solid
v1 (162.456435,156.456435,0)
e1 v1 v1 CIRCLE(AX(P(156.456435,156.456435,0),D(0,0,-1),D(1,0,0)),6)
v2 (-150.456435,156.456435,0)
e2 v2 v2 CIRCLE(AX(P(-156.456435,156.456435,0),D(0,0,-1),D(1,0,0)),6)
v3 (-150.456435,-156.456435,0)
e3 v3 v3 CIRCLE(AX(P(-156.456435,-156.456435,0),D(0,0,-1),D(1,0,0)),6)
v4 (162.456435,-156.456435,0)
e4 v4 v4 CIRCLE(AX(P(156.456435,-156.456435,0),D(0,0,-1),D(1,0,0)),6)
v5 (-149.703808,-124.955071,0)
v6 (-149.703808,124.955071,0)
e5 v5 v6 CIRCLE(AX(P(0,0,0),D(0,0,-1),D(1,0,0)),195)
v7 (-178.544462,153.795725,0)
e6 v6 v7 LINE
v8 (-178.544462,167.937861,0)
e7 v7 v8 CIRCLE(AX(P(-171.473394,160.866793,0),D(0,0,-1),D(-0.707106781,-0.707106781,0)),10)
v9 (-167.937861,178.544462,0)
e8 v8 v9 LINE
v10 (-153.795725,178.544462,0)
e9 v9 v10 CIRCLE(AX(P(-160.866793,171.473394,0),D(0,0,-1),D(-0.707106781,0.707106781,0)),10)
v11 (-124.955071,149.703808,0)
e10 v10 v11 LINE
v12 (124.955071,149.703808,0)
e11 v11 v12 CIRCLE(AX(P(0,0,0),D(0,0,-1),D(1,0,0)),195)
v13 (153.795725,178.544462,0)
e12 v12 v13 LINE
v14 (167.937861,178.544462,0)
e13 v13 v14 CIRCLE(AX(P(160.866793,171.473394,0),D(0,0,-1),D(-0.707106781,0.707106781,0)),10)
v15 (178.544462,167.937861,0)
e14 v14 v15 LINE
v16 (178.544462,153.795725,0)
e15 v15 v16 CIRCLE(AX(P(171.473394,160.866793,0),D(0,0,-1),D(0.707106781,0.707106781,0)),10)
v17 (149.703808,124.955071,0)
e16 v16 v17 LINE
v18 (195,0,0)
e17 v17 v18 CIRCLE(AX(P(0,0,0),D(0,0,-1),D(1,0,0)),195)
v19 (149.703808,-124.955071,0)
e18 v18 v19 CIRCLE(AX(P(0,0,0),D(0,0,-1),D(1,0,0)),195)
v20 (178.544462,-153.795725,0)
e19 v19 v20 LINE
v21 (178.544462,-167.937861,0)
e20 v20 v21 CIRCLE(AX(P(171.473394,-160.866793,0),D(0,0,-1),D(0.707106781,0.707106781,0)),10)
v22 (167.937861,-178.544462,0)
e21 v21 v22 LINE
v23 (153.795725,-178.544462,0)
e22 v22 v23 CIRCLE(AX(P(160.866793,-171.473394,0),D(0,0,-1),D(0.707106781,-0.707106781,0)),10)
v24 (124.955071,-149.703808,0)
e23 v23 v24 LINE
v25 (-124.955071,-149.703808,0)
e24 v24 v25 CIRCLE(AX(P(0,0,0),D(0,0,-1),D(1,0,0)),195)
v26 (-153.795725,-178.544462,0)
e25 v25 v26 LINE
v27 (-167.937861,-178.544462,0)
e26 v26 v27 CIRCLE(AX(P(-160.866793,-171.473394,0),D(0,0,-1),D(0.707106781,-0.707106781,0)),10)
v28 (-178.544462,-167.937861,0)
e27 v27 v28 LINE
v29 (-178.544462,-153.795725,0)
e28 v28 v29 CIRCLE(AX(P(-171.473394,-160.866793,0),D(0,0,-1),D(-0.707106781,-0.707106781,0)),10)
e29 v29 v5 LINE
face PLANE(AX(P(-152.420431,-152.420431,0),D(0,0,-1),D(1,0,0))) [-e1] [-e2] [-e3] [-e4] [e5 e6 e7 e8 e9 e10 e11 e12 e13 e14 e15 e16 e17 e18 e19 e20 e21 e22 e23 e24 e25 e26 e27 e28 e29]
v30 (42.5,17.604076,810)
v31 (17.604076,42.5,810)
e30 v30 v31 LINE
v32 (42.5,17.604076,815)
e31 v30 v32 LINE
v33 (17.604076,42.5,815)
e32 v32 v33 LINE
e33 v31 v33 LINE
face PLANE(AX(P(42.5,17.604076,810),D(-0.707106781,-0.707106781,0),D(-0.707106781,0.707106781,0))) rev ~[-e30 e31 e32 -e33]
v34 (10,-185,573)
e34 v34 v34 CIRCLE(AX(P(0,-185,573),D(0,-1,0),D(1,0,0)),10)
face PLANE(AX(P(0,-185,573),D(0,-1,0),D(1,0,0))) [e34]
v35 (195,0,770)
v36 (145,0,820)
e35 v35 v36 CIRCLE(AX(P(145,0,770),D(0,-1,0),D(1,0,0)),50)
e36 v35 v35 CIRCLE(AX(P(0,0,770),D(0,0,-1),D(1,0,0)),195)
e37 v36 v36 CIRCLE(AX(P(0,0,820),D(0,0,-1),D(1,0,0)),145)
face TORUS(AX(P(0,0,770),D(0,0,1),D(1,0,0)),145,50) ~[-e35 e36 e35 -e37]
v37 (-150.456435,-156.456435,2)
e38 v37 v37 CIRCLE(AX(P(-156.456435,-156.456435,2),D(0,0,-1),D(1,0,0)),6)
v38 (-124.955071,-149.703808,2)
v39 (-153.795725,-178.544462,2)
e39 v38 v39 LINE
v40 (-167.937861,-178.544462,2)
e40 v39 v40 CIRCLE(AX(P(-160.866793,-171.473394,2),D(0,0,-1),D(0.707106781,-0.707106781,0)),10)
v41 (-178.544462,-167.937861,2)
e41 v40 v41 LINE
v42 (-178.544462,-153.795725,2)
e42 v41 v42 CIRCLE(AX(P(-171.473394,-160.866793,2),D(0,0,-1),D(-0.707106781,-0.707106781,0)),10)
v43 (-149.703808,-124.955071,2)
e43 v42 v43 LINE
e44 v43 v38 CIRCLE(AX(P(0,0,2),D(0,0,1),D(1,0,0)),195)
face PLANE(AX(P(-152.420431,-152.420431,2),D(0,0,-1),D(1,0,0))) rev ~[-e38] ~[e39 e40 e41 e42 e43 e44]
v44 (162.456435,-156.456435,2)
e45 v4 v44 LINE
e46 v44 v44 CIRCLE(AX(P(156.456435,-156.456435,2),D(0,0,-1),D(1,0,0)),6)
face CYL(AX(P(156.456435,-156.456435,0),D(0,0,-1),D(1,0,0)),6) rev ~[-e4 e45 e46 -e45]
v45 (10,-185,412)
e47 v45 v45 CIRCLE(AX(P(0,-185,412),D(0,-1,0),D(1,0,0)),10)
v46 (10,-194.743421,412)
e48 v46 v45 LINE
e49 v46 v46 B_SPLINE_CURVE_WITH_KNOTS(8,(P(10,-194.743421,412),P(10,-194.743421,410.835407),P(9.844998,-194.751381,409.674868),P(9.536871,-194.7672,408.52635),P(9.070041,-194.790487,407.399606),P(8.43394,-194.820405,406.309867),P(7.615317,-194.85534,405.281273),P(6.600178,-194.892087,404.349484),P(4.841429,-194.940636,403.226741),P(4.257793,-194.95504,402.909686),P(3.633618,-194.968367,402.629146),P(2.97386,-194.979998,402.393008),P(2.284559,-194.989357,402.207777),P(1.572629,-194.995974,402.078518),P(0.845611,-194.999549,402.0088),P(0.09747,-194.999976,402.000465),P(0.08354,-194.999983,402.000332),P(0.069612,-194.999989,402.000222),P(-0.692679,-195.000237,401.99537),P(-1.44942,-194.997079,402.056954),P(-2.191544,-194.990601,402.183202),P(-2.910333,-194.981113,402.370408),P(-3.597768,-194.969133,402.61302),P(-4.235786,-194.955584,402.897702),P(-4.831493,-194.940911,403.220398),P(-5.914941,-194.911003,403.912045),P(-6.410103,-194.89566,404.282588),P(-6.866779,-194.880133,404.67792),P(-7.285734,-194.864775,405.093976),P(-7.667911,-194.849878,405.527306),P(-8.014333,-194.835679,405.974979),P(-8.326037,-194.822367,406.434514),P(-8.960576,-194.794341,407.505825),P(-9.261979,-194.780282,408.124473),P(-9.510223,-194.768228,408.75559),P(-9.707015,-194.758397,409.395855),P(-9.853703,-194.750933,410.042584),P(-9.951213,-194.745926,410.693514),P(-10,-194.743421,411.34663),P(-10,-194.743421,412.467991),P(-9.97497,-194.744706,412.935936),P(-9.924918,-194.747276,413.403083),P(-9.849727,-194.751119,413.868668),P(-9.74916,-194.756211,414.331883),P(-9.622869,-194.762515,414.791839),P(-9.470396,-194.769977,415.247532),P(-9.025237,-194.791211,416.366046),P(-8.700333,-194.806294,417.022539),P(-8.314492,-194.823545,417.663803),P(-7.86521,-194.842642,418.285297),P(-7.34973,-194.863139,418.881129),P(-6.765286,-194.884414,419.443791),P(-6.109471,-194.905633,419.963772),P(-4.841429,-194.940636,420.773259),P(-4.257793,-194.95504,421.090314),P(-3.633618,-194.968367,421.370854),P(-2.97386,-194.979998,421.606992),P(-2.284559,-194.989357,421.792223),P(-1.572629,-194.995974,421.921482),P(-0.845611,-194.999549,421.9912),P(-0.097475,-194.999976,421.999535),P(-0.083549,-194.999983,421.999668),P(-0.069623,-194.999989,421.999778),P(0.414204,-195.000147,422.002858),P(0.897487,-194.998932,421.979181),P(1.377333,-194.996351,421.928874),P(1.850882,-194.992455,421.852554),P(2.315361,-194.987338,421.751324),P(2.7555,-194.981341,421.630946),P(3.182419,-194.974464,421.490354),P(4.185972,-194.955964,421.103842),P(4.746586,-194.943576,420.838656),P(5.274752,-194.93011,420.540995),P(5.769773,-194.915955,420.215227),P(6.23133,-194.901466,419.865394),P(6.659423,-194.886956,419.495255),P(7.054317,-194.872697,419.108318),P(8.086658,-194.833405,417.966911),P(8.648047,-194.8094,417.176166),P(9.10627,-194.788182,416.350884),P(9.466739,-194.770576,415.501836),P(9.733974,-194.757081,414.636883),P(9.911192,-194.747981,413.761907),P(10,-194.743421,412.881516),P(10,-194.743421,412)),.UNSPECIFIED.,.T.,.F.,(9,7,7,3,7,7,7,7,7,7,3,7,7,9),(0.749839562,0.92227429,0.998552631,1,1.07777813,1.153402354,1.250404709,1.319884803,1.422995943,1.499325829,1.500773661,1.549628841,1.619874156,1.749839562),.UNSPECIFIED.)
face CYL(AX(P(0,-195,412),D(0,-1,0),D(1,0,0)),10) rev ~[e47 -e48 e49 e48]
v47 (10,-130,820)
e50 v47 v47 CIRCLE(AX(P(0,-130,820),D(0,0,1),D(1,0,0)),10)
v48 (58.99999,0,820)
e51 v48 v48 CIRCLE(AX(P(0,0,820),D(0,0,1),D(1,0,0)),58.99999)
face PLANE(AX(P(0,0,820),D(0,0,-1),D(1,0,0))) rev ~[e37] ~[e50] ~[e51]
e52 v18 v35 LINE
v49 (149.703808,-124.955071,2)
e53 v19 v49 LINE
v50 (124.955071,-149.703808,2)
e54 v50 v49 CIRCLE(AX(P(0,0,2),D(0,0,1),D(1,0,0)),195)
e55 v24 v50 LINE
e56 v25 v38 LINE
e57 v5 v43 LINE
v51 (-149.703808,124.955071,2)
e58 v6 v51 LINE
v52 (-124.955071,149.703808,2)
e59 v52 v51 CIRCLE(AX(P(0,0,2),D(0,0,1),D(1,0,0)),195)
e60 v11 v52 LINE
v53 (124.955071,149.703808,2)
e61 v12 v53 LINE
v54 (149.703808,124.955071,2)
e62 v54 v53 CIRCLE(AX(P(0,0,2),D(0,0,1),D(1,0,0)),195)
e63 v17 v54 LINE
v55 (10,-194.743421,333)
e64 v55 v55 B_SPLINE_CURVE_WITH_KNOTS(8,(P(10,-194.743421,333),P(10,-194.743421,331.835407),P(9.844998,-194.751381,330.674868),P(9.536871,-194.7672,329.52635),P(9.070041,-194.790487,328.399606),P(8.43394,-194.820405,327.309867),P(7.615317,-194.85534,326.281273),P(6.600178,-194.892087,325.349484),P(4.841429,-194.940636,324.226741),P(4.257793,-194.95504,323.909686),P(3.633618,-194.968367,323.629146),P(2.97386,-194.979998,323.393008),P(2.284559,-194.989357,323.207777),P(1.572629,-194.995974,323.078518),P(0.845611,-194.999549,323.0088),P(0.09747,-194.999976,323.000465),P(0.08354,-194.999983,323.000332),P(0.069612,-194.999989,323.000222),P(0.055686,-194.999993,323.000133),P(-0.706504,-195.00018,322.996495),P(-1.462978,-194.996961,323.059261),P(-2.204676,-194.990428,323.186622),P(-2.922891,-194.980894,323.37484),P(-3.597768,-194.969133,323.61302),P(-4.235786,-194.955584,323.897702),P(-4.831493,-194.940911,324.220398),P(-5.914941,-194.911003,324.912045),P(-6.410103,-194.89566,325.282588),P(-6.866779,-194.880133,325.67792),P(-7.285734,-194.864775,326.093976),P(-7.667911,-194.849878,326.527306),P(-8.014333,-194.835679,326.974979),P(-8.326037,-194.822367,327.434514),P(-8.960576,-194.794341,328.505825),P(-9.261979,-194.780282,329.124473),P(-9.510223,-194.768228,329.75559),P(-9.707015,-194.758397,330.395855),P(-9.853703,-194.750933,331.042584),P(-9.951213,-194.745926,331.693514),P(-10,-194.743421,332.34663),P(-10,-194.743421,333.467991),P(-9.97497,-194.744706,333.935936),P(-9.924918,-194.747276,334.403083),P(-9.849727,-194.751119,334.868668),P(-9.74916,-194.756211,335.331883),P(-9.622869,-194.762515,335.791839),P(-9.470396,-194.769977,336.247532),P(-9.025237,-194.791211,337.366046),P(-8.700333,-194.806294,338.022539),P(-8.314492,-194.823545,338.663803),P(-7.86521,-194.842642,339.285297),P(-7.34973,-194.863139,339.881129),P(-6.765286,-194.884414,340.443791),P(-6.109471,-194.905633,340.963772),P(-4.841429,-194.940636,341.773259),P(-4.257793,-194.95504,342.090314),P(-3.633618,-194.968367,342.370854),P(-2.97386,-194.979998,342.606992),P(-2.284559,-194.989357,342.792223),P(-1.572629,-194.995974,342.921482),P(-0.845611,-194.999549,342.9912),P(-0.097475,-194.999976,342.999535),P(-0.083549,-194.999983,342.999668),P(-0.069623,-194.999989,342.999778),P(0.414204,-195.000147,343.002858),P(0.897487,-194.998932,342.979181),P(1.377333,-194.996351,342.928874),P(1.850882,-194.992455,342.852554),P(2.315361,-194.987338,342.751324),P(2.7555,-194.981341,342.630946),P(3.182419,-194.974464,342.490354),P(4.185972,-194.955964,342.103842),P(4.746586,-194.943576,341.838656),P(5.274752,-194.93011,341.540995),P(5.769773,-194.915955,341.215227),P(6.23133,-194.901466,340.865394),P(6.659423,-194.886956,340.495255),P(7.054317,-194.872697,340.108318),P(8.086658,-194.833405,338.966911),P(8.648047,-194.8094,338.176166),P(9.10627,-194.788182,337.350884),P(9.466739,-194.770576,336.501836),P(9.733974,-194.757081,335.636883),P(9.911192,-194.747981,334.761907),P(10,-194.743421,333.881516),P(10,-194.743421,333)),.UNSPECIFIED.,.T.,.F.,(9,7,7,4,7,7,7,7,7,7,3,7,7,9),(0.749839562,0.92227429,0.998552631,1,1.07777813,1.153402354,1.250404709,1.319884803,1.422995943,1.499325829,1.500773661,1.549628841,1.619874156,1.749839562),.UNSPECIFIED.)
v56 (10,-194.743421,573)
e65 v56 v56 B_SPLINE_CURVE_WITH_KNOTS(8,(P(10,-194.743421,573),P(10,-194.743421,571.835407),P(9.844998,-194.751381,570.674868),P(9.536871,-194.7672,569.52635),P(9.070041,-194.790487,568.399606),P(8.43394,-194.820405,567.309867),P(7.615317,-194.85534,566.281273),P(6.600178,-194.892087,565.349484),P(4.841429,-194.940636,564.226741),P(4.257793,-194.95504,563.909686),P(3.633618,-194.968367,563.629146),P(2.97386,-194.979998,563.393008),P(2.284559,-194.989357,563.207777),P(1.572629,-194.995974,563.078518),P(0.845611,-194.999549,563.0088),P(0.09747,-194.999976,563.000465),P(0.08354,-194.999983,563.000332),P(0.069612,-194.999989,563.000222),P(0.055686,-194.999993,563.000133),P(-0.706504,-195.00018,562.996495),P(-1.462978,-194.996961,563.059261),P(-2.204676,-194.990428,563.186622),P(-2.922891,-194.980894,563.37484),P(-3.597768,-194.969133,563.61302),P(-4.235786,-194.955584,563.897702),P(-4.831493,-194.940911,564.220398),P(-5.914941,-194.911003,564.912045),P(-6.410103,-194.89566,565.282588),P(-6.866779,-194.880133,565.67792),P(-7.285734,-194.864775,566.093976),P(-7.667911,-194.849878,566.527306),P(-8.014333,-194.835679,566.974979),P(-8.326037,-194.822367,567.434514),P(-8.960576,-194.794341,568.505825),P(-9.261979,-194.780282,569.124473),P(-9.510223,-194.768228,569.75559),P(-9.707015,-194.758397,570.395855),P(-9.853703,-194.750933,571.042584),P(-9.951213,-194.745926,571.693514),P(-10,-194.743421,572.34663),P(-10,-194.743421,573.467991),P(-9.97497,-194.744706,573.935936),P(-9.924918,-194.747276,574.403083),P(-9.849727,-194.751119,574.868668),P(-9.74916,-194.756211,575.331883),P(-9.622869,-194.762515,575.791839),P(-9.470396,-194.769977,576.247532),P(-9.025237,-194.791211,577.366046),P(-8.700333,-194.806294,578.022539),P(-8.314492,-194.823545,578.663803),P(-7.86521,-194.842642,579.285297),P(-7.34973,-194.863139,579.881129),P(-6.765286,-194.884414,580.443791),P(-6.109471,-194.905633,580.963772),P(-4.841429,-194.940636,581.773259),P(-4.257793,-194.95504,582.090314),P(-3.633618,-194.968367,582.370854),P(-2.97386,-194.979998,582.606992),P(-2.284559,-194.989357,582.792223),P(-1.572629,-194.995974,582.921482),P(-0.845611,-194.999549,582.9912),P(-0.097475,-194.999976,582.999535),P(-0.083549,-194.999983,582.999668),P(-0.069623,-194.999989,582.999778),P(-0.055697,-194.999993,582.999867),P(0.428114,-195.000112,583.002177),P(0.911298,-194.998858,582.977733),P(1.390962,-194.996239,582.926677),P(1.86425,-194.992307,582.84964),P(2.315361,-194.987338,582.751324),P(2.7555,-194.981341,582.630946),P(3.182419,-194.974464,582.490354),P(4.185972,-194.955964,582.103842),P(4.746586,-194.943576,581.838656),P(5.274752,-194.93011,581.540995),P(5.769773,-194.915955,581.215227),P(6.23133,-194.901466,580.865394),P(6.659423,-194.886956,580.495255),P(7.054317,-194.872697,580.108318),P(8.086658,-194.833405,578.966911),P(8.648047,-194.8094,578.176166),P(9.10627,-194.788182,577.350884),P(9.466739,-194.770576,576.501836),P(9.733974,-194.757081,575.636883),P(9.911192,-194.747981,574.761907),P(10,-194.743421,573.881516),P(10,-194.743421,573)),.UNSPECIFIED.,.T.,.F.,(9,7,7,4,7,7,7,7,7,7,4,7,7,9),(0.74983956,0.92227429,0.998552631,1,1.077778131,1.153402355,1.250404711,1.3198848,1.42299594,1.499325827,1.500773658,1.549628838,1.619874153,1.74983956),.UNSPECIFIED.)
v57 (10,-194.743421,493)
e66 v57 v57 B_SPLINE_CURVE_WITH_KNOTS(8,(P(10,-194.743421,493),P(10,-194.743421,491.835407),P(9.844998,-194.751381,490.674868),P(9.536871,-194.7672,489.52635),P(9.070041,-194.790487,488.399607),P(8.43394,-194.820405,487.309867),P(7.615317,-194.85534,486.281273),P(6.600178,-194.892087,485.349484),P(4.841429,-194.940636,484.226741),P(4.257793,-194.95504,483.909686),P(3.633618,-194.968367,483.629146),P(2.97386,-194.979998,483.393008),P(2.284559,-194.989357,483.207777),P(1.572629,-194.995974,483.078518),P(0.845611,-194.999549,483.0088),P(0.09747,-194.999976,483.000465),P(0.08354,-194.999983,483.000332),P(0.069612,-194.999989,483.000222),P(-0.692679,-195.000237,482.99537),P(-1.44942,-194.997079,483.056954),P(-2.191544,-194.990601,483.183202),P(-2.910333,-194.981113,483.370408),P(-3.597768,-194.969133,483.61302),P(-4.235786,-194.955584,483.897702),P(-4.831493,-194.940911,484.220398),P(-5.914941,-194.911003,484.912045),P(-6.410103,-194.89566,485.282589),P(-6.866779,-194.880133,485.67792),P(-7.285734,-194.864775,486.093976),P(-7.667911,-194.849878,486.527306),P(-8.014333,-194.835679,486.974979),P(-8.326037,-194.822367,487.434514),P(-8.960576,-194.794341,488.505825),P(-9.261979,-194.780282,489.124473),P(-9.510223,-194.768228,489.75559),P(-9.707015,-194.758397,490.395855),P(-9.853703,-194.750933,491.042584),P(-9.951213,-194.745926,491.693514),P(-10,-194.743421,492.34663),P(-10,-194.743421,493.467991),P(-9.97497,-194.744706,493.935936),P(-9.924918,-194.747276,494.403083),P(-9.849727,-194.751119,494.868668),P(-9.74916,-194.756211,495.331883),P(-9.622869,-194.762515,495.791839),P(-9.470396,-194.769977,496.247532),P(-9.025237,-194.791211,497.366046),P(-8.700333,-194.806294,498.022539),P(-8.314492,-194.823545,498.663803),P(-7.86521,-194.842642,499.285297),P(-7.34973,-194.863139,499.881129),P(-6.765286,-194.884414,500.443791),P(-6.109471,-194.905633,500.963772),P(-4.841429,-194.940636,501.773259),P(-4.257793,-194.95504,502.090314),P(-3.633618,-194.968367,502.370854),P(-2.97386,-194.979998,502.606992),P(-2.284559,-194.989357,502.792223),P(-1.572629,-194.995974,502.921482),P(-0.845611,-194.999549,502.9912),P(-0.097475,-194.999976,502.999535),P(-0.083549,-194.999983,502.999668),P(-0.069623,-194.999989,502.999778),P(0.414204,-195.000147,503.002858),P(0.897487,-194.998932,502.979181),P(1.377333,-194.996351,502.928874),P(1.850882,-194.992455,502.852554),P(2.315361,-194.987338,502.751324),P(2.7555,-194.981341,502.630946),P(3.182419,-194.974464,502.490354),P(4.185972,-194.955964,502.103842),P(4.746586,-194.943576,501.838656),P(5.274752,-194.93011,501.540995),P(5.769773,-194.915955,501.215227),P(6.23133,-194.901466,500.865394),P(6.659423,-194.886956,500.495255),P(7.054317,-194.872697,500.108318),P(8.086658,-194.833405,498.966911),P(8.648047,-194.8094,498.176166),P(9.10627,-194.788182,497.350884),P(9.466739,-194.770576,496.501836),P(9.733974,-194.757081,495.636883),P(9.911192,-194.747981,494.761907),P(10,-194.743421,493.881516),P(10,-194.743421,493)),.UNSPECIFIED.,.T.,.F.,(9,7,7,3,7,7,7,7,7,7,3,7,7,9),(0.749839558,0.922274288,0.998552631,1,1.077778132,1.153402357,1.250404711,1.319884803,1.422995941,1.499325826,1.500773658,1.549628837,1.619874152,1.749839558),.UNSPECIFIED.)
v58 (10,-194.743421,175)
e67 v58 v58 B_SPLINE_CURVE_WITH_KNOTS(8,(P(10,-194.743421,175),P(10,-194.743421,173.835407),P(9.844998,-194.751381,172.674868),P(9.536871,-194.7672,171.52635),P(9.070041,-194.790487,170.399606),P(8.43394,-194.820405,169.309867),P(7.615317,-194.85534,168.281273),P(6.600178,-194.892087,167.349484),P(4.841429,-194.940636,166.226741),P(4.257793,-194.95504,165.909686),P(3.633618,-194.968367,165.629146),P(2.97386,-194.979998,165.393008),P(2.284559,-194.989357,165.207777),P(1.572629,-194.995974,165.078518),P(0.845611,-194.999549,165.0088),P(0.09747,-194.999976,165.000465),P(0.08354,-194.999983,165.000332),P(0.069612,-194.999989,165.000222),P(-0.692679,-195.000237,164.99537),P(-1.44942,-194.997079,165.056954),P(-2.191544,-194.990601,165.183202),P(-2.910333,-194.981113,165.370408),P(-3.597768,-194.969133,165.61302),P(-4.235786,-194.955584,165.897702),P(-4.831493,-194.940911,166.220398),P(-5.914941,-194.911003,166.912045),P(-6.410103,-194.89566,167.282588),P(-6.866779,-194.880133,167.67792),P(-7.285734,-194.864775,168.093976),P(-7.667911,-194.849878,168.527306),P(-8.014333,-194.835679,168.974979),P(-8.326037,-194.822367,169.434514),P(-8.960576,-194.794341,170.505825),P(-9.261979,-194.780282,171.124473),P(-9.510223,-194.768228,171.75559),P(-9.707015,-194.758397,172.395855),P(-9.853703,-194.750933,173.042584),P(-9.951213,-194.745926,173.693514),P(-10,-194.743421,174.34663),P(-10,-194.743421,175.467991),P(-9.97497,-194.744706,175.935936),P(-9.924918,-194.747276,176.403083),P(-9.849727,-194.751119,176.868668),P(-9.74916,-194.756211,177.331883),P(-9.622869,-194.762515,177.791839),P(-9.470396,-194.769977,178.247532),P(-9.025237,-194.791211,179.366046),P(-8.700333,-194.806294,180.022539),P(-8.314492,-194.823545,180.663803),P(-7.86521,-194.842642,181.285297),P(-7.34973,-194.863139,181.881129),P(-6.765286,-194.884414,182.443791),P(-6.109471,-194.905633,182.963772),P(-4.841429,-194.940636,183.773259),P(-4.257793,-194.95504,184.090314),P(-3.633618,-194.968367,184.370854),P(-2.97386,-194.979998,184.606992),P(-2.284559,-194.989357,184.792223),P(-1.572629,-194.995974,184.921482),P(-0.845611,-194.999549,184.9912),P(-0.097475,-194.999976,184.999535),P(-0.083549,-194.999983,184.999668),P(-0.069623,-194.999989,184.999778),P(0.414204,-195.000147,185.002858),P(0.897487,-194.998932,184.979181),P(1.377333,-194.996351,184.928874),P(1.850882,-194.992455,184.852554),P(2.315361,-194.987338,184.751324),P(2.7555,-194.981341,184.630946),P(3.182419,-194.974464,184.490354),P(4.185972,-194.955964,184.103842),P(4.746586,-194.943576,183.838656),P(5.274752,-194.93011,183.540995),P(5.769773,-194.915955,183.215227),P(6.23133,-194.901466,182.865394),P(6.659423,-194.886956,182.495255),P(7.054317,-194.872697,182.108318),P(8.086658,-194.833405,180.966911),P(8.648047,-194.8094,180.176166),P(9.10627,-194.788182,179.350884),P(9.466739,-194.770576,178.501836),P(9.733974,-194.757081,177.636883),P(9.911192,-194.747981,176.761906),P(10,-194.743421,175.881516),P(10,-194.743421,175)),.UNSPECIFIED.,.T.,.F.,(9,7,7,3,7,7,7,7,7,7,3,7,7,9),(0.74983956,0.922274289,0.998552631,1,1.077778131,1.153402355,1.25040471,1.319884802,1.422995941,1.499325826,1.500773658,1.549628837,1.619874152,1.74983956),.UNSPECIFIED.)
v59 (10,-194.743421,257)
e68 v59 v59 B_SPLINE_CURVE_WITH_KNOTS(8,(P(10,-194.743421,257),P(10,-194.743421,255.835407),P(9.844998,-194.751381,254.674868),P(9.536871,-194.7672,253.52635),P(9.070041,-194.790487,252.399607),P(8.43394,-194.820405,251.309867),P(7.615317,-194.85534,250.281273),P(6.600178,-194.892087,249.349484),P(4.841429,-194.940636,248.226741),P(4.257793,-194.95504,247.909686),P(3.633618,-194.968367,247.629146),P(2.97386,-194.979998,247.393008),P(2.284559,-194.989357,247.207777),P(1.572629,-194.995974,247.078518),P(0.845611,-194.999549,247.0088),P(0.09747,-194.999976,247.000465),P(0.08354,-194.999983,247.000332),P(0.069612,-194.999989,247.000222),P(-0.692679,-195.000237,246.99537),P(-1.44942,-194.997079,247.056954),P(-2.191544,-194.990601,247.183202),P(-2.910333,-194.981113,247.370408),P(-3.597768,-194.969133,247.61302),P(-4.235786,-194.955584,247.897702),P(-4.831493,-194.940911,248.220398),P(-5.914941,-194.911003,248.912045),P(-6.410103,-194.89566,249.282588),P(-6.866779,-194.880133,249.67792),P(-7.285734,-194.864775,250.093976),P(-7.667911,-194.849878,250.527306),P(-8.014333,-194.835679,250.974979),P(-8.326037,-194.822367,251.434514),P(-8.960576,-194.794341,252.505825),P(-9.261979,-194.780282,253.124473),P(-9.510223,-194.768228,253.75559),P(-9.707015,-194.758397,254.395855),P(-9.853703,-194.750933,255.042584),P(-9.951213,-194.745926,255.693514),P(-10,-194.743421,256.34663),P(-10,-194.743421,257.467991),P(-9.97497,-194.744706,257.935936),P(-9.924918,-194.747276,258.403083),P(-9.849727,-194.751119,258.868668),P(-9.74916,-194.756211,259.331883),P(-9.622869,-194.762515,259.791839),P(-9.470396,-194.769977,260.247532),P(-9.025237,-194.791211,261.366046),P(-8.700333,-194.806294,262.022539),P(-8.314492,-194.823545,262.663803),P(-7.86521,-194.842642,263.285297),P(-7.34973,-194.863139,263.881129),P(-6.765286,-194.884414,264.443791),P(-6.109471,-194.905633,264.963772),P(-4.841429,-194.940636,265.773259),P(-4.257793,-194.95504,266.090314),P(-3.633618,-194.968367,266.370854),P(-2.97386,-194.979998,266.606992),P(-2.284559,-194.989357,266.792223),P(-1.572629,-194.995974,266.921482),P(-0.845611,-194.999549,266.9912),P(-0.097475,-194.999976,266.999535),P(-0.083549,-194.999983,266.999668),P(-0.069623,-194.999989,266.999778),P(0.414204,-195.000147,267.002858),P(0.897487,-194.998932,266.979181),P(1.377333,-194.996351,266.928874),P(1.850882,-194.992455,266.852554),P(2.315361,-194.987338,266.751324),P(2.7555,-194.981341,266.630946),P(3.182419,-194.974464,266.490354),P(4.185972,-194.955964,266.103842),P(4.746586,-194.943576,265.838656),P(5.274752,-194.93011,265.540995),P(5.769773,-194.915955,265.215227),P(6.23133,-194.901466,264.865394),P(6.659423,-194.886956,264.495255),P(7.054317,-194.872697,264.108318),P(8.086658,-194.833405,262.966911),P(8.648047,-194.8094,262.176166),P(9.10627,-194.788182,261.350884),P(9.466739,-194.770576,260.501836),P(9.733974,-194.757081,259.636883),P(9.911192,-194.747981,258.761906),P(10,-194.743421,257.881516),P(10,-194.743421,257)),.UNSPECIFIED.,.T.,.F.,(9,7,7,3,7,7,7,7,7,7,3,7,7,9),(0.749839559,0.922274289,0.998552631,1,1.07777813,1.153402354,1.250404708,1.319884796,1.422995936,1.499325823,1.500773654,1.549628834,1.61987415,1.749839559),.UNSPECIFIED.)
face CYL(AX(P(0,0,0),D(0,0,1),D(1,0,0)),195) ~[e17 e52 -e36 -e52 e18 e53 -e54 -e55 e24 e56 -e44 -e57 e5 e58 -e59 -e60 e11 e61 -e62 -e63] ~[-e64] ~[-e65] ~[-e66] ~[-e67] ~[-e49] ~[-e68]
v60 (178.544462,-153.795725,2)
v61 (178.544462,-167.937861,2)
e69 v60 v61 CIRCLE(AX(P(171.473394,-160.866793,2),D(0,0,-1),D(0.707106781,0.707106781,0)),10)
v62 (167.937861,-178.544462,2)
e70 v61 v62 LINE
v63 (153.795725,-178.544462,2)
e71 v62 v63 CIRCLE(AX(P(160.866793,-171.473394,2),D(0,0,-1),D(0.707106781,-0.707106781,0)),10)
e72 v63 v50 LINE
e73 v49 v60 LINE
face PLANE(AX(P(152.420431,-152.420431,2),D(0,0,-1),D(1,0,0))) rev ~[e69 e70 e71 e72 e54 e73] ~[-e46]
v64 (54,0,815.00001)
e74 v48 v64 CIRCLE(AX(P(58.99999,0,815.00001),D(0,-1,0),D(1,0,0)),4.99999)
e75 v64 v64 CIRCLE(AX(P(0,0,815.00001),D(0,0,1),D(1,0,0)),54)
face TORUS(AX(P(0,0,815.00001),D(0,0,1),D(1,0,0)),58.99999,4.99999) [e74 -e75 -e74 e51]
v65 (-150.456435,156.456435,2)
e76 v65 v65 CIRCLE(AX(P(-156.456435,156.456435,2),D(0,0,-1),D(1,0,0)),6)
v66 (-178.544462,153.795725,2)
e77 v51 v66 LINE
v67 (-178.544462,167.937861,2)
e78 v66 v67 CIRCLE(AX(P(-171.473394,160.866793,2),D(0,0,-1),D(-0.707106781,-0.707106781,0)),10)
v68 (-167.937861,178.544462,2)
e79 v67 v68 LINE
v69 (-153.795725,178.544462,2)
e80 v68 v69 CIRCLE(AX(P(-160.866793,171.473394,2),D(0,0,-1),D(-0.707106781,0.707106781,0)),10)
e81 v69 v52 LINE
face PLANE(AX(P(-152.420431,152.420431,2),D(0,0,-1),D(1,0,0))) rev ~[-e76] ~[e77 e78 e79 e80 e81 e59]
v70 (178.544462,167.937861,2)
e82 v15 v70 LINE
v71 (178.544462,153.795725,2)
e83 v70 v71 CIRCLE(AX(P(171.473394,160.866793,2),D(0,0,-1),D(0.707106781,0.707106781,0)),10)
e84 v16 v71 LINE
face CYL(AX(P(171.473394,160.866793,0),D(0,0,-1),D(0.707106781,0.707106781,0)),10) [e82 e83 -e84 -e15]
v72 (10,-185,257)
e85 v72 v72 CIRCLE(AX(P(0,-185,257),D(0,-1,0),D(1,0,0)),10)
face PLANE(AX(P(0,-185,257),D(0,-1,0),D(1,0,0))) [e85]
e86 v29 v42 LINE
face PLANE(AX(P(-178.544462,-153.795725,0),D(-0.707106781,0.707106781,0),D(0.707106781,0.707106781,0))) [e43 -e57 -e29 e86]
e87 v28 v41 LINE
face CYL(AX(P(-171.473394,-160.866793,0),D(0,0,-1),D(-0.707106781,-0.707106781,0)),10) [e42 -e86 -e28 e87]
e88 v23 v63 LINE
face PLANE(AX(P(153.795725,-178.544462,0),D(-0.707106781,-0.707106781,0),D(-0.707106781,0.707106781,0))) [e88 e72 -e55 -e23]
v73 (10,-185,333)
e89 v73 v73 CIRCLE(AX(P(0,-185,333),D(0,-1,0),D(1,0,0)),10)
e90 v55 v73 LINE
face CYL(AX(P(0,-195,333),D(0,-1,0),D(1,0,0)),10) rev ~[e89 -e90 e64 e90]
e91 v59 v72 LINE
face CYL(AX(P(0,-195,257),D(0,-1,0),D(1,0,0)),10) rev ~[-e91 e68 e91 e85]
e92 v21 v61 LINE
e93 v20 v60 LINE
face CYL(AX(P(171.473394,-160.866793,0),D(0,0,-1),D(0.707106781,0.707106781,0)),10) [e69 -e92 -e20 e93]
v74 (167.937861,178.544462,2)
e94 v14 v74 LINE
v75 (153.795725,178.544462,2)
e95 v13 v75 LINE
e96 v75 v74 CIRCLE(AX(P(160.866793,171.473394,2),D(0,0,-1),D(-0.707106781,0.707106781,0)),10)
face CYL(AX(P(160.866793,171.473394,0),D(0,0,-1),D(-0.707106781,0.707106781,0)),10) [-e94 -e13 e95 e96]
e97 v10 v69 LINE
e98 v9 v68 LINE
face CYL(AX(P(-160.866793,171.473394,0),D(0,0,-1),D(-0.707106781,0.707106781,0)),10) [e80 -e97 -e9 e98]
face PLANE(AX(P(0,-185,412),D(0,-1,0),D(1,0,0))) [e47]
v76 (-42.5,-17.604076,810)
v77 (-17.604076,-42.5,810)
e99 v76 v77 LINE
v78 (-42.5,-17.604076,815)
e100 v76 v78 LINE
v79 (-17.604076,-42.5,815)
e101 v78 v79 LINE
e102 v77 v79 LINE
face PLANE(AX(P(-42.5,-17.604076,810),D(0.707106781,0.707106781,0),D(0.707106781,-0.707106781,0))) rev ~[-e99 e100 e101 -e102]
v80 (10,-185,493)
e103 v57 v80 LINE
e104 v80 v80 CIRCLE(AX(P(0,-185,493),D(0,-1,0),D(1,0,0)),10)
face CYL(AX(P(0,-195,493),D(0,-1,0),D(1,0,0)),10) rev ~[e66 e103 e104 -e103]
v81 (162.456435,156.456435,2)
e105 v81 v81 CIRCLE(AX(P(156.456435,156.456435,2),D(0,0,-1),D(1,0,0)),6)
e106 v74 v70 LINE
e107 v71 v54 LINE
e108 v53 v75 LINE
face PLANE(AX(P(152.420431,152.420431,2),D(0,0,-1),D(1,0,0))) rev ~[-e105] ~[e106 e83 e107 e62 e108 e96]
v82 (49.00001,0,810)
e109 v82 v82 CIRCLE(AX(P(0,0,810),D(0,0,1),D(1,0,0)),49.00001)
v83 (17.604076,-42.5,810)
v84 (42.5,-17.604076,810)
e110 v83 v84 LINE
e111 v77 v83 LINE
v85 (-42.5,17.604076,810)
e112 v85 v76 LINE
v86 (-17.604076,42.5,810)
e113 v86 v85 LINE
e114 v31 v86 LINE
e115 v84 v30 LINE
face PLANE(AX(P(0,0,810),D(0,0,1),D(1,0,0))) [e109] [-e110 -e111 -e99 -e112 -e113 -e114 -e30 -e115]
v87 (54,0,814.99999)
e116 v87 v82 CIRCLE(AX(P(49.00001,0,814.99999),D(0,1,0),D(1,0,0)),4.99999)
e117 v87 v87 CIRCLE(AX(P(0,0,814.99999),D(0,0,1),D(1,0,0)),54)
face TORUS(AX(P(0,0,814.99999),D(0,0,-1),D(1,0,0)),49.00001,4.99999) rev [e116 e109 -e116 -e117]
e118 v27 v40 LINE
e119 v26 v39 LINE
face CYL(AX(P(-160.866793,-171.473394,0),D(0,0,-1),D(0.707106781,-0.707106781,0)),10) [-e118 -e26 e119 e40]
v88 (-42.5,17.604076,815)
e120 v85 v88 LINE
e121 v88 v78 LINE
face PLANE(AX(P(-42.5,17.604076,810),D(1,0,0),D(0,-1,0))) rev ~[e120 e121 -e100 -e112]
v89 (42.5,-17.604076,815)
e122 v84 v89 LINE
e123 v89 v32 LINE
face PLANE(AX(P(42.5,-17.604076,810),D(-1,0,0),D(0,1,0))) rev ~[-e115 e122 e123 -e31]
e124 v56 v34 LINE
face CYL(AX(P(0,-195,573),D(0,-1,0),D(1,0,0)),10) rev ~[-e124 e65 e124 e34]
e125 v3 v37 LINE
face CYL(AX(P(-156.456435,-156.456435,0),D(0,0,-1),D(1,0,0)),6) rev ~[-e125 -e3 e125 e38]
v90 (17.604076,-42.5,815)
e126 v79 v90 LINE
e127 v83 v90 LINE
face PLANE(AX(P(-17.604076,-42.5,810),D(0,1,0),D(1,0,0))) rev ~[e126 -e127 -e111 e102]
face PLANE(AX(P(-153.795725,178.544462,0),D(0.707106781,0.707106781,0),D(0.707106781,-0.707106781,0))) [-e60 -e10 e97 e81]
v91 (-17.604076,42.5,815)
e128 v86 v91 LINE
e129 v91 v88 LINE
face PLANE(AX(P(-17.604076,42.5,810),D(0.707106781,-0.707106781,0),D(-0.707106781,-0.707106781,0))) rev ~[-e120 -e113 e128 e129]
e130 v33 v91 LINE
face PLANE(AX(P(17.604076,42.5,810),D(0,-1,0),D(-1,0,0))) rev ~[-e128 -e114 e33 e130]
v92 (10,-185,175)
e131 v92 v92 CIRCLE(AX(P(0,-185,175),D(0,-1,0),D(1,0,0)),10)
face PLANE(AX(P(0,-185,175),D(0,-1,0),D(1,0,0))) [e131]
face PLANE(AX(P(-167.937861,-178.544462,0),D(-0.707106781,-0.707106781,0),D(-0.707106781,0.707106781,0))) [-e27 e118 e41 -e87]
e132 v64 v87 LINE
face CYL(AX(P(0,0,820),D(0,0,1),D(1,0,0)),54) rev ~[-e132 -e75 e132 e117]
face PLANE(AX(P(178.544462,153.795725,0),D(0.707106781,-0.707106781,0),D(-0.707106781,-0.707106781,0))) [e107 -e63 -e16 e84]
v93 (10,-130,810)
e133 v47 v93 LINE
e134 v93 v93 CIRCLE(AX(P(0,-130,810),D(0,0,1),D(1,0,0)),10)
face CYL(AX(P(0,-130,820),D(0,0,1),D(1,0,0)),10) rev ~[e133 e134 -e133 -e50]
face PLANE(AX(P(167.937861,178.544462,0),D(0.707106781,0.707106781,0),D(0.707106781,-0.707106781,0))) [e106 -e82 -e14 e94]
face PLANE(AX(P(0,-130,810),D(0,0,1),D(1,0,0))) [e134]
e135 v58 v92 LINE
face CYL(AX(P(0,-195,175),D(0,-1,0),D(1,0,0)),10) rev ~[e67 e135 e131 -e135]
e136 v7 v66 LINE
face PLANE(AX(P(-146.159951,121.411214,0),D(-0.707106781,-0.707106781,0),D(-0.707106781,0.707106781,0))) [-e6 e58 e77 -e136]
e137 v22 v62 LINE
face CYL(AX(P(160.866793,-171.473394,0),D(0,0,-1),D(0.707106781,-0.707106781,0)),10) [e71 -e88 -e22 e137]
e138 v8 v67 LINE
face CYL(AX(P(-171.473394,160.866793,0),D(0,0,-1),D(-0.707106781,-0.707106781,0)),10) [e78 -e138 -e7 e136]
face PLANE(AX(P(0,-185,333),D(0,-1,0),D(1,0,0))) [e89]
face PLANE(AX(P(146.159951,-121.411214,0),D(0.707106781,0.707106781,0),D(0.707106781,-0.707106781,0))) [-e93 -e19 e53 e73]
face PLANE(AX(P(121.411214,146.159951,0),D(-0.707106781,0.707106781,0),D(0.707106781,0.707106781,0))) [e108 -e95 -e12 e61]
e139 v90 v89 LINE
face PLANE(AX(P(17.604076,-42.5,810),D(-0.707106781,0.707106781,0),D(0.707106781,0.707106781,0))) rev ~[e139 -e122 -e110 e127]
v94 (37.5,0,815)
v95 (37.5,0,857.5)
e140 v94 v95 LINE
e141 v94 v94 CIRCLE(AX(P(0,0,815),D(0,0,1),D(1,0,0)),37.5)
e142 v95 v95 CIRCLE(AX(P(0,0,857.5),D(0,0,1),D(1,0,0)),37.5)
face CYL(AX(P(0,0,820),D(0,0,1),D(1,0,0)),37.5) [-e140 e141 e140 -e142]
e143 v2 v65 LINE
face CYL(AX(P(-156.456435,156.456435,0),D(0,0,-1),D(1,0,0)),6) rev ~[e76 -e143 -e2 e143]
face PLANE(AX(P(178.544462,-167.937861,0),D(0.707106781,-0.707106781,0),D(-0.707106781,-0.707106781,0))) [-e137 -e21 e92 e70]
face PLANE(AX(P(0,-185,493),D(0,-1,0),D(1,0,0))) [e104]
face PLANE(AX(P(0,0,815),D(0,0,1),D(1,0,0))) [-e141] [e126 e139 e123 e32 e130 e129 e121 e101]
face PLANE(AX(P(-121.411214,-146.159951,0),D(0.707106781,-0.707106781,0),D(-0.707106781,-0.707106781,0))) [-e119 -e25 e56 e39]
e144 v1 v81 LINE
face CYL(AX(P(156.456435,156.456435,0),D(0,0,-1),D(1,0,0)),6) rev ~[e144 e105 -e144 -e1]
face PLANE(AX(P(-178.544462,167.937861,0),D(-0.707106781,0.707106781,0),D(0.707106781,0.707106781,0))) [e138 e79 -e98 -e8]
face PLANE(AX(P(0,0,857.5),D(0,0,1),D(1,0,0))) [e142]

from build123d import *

# Parameters (mm, degrees)
F3_R      = 54
F4_DEPTH  = 10
F5_R      = 4.99999
F7_DEPTH  = 5
F8_R      = 37.5
F9_DEPTH  = 37.5
F11_R     = 10
F12_DEPTH = 10
F13_R     = 10
F14_DEPTH = 10
F15_R     = 6
F16_DEPTH = 2


# Not quite as in the source:
# - a fillet or chamfer is up to 0.001 mm smaller than in the source, because OpenCascade refuses the exact size


with BuildPart() as f2:
    # F1 (on Front) → F2 (revolve)
    with BuildSketch(Plane.XZ):
        with BuildLine():
            Line((0, 820), (0, 0))
            Line((0, 0), (195, 0))
            Line((195, 0), (195, 770))
            ThreePointArc((195, 770), (180.3553390593, 805.3553390593), (145, 820))
            Line((145, 820), (0, 820))
        make_face()
    revolve(axis=Axis((0, 0, 410), (0, 0, -1)))

    # F3 (on face) → F4 (cut)
    with BuildSketch(Plane.XY.offset(820)):
        Circle(F3_R)
    extrude(amount=-F4_DEPTH, mode=Mode.SUBTRACT)

    # F5 (radius 5 in the source; OpenCascade refuses exactly that, so slightly less here)
    f5_edges = [f2.edges().sort_by_distance(p)[0] for p in [
        (-54, 0, 820),
        (-54, 0, 810),
    ]]
    fillet(f5_edges, radius=F5_R)

    # F6 (on face) → F7 (join)
    with BuildSketch(Plane.XY.offset(810)):
        Polygon((-17.6040764009, -42.5), (17.6040764009, -42.5), (42.5, -17.6040764009), (42.5, 17.6040764009), (17.6040764009, 42.5), (-17.6040764009, 42.5), (-42.5, 17.6040764009), (-42.5, -17.6040764009), align=None)
    extrude(amount=F7_DEPTH)

    # F8 (on face) → F9 (join, symmetric)
    with BuildSketch(Plane.XY.offset(820)):
        Circle(F8_R)
    extrude(amount=F9_DEPTH, both=True)

    # F11 (on offset) → F12 (cut)
    with BuildSketch(Plane.XZ.offset(195)):
        with Locations((0, 175)):
            Circle(F11_R)
        with Locations((0, 257)):
            Circle(F11_R)
        with Locations((0, 333)):
            Circle(F11_R)
        with Locations((0, 412)):
            Circle(F11_R)
        with Locations((0, 493)):
            Circle(F11_R)
        with Locations((0, 573)):
            Circle(F11_R)
    extrude(amount=-F12_DEPTH, mode=Mode.SUBTRACT)

    # F13 (on face) → F14 (cut)
    with BuildSketch(Plane.XY.offset(820)):
        with Locations((0, -130)):
            Circle(F13_R)
    extrude(amount=-F14_DEPTH, mode=Mode.SUBTRACT)

    # F15 (on face) → F16 (join)
    with BuildSketch(Plane(origin=(0, 0, 0), x_dir=(1, 0, 0), z_dir=(0, 0, -1))):
        with BuildLine():
            ThreePointArc((-153.7957249081, 178.5444622496), (-160.8667927199, 181.4733944377), (-167.9378605318, 178.5444622496))
            Line((-167.9378605318, 178.5444622496), (-178.5444622496, 167.9378605318))
            ThreePointArc((-178.5444622496, 167.9378605318), (-181.4733944377, 160.8667927199), (-178.5444622496, 153.7957249081))
            Line((-178.5444622496, 153.7957249081), (-146.1599508606, 121.411213519))
            Line((-146.1599508606, 121.411213519), (-121.411213519, 146.1599508606))
            Line((-121.411213519, 146.1599508606), (-153.7957249081, 178.5444622496))
        make_face()
        with Locations((-156.4564352241, 156.4564352241)):
            Circle(F15_R, mode=Mode.SUBTRACT)
        with BuildLine():
            Line((-153.7957249081, -178.5444622496), (-121.411213519, -146.1599508606))
            Line((-121.411213519, -146.1599508606), (-146.1599508606, -121.411213519))
            Line((-146.1599508606, -121.411213519), (-178.5444622496, -153.7957249081))
            ThreePointArc((-178.5444622496, -153.7957249081), (-181.4733944377, -160.8667927199), (-178.5444622496, -167.9378605318))
            Line((-178.5444622496, -167.9378605318), (-167.9378605318, -178.5444622496))
            ThreePointArc((-167.9378605318, -178.5444622496), (-160.8667927199, -181.4733944377), (-153.7957249081, -178.5444622496))
        make_face()
        with Locations((-156.4564352241, -156.4564352241)):
            Circle(F15_R, mode=Mode.SUBTRACT)
        with BuildLine():
            Line((178.5444622496, -153.7957249081), (146.1599508606, -121.411213519))
            Line((146.1599508606, -121.411213519), (121.411213519, -146.1599508606))
            Line((121.411213519, -146.1599508606), (153.7957249081, -178.5444622496))
            ThreePointArc((153.7957249081, -178.5444622496), (160.8667927199, -181.4733944377), (167.9378605318, -178.5444622496))
            Line((167.9378605318, -178.5444622496), (178.5444622496, -167.9378605318))
            ThreePointArc((178.5444622496, -167.9378605318), (181.4733944377, -160.8667927199), (178.5444622496, -153.7957249081))
        make_face()
        with Locations((156.4564352241, -156.4564352241)):
            Circle(F15_R, mode=Mode.SUBTRACT)
        with BuildLine():
            Line((153.7957249081, 178.5444622496), (121.411213519, 146.1599508606))
            Line((121.411213519, 146.1599508606), (146.1599508606, 121.411213519))
            Line((146.1599508606, 121.411213519), (178.5444622496, 153.7957249081))
            ThreePointArc((178.5444622496, 153.7957249081), (181.4733944377, 160.8667927199), (178.5444622496, 167.9378605318))
            Line((178.5444622496, 167.9378605318), (167.9378605318, 178.5444622496))
            ThreePointArc((167.9378605318, 178.5444622496), (160.8667927199, 181.4733944377), (153.7957249081, 178.5444622496))
        make_face()
        with Locations((156.4564352241, 156.4564352241)):
            Circle(F15_R, mode=Mode.SUBTRACT)
    extrude(amount=-F16_DEPTH)


solid = f2.part
